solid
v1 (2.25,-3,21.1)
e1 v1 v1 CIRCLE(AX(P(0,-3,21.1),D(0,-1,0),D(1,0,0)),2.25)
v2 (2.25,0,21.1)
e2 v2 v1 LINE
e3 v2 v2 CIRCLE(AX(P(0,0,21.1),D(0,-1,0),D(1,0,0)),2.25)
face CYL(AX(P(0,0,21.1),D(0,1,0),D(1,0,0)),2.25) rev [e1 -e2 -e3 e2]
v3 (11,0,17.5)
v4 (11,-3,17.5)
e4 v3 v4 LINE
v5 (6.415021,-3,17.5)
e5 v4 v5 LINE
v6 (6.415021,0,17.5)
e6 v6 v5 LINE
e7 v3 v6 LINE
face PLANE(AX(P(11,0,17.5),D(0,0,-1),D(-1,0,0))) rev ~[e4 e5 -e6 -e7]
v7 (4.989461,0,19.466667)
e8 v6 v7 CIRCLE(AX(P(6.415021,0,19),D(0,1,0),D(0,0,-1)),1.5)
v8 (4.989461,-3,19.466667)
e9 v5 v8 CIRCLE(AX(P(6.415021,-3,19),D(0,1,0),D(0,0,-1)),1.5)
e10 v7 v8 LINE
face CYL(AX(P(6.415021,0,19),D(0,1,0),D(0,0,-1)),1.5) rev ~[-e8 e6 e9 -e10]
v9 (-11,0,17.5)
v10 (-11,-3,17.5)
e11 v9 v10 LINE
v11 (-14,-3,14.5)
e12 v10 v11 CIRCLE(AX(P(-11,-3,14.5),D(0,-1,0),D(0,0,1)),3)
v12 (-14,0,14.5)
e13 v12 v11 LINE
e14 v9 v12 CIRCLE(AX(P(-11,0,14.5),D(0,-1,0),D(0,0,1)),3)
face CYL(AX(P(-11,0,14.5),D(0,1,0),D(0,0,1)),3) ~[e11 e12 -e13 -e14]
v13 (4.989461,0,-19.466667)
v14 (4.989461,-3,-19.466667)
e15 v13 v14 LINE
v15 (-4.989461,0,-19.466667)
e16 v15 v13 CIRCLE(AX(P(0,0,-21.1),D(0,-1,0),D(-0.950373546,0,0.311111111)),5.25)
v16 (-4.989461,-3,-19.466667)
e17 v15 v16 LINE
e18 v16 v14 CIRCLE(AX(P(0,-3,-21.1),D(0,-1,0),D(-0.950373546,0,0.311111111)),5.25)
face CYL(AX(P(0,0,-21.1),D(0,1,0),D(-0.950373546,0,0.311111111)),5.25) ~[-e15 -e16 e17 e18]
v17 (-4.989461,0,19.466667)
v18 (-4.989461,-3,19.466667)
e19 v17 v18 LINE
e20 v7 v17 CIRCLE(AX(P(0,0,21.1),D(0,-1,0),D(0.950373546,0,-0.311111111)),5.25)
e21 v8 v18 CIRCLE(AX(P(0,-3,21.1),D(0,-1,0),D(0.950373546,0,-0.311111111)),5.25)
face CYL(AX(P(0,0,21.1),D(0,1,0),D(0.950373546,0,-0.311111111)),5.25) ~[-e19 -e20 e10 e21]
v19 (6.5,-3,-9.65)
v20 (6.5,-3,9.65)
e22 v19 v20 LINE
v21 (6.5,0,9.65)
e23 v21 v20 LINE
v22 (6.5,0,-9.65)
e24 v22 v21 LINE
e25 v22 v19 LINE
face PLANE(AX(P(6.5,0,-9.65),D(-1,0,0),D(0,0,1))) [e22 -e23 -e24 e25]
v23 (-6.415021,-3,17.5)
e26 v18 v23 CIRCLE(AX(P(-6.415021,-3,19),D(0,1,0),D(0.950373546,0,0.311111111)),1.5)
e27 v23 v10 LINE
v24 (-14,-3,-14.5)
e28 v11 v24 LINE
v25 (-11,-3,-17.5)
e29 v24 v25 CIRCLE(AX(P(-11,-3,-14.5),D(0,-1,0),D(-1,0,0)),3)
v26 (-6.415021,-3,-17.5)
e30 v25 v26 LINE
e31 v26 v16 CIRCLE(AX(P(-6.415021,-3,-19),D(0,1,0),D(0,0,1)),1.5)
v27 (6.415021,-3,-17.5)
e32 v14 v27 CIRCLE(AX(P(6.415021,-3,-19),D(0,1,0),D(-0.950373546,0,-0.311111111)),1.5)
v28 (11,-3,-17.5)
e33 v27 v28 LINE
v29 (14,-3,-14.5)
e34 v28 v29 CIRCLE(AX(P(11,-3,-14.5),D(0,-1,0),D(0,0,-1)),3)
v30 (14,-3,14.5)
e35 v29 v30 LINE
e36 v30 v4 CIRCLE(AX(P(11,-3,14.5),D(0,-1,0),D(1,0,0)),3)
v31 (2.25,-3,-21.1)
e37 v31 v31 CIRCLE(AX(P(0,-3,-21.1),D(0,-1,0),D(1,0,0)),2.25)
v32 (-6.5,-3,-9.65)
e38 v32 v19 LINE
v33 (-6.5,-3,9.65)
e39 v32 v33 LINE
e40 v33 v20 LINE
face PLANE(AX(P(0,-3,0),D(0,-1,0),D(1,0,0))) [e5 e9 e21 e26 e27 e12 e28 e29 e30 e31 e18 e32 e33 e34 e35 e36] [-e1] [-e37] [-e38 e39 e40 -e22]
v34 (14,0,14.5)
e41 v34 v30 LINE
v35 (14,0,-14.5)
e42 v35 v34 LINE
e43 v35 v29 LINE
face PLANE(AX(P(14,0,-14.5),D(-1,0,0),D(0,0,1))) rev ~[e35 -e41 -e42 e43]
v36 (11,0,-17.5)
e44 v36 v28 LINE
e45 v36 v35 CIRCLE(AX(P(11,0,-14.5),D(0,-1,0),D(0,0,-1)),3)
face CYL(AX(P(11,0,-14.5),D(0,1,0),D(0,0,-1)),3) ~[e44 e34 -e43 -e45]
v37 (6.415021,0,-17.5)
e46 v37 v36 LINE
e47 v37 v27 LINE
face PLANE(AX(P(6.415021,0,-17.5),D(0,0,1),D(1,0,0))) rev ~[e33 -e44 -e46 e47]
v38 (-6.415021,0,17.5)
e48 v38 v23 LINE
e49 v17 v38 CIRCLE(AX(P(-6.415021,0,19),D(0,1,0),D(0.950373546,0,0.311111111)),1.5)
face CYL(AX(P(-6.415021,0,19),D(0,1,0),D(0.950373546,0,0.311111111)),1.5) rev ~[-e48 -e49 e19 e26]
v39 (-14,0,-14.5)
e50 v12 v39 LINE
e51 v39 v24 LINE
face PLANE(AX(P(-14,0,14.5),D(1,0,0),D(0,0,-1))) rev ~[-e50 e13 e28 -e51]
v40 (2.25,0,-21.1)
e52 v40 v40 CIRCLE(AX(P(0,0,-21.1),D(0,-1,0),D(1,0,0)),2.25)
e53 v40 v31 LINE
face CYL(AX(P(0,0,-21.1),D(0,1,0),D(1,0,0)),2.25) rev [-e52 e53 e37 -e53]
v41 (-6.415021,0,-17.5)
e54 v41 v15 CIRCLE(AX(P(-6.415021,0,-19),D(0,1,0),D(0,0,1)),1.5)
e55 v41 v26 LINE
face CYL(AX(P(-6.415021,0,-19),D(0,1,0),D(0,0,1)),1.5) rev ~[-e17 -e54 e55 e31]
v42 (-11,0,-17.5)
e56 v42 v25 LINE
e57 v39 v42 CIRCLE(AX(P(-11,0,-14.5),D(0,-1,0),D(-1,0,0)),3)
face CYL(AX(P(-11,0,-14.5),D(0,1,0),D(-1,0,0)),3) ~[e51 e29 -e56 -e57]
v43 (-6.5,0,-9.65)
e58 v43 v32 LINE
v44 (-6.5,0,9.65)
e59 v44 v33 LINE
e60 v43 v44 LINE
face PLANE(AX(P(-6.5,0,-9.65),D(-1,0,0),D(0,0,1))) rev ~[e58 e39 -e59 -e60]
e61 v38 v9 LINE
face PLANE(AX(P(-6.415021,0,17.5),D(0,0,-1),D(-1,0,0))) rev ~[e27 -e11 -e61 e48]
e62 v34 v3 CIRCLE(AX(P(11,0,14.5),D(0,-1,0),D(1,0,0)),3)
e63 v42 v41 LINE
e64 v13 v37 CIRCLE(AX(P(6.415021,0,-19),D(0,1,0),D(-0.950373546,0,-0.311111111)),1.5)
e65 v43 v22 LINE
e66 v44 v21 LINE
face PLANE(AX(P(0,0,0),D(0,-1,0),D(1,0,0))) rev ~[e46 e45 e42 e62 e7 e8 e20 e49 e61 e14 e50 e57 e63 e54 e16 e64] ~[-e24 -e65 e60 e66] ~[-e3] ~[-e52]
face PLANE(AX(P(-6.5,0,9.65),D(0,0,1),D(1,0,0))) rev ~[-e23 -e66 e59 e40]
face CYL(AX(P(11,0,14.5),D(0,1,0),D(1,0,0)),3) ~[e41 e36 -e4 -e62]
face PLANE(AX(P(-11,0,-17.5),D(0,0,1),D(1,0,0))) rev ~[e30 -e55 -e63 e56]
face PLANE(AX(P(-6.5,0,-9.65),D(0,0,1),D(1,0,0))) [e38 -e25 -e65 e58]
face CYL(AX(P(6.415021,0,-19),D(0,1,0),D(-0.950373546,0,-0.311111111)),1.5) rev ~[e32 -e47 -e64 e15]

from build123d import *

# Parameters (mm, degrees)
F0_R     = 2.25
F0_W     = 13
F0_H     = 19.3
F1_DEPTH = 3


# Not quite as in the source:
# - a feature names something its author has since deleted; it is built from what else it names


with BuildPart() as f1:
    # F0 (on Front) → F1 (new body)
    with BuildSketch(Plane.XZ):
        with BuildLine():
            Line((-6.4150214341, 17.5), (-11, 17.5))
            ThreePointArc((-11, 17.5), (-13.1213203436, 16.6213203436), (-14, 14.5))
            Line((-14, 14.5), (-14, -14.5))
            ThreePointArc((-14, -14.5), (-13.1213203436, -16.6213203436), (-11, -17.5))
            Line((-11, -17.5), (-6.4150214341, -17.5))
            ThreePointArc((-6.4150214341, -17.5), (-5.200525654, -18.1196591569), (-4.9894611154, -19.4666666667))
            ThreePointArc((-4.9894611154, -19.4666666667), (0, -26.35), (4.9894611154, -19.4666666667))
            ThreePointArc((4.9894611154, -19.4666666667), (5.200525654, -18.1196591569), (6.4150214341, -17.5))
            Line((6.4150214341, -17.5), (11, -17.5))
            ThreePointArc((11, -17.5), (13.1213203436, -16.6213203436), (14, -14.5))
            Line((14, -14.5), (14, 14.5))
            ThreePointArc((14, 14.5), (13.1213203436, 16.6213203436), (11, 17.5))
            Line((11, 17.5), (6.4150214341, 17.5))
            ThreePointArc((6.4150214341, 17.5), (5.200525654, 18.1196591569), (4.9894611154, 19.4666666667))
            ThreePointArc((4.9894611154, 19.4666666667), (0, 26.35), (-4.9894611154, 19.4666666667))
            ThreePointArc((-4.9894611154, 19.4666666667), (-5.200525654, 18.1196591569), (-6.4150214341, 17.5))
        make_face()
        with Locations((0, -21.1)):
            Circle(F0_R, mode=Mode.SUBTRACT)
        Rectangle(F0_W, F0_H, mode=Mode.SUBTRACT)
        with Locations((0, 21.1)):
            Circle(F0_R, mode=Mode.SUBTRACT)
    extrude(amount=F1_DEPTH)


solid = f1.part
